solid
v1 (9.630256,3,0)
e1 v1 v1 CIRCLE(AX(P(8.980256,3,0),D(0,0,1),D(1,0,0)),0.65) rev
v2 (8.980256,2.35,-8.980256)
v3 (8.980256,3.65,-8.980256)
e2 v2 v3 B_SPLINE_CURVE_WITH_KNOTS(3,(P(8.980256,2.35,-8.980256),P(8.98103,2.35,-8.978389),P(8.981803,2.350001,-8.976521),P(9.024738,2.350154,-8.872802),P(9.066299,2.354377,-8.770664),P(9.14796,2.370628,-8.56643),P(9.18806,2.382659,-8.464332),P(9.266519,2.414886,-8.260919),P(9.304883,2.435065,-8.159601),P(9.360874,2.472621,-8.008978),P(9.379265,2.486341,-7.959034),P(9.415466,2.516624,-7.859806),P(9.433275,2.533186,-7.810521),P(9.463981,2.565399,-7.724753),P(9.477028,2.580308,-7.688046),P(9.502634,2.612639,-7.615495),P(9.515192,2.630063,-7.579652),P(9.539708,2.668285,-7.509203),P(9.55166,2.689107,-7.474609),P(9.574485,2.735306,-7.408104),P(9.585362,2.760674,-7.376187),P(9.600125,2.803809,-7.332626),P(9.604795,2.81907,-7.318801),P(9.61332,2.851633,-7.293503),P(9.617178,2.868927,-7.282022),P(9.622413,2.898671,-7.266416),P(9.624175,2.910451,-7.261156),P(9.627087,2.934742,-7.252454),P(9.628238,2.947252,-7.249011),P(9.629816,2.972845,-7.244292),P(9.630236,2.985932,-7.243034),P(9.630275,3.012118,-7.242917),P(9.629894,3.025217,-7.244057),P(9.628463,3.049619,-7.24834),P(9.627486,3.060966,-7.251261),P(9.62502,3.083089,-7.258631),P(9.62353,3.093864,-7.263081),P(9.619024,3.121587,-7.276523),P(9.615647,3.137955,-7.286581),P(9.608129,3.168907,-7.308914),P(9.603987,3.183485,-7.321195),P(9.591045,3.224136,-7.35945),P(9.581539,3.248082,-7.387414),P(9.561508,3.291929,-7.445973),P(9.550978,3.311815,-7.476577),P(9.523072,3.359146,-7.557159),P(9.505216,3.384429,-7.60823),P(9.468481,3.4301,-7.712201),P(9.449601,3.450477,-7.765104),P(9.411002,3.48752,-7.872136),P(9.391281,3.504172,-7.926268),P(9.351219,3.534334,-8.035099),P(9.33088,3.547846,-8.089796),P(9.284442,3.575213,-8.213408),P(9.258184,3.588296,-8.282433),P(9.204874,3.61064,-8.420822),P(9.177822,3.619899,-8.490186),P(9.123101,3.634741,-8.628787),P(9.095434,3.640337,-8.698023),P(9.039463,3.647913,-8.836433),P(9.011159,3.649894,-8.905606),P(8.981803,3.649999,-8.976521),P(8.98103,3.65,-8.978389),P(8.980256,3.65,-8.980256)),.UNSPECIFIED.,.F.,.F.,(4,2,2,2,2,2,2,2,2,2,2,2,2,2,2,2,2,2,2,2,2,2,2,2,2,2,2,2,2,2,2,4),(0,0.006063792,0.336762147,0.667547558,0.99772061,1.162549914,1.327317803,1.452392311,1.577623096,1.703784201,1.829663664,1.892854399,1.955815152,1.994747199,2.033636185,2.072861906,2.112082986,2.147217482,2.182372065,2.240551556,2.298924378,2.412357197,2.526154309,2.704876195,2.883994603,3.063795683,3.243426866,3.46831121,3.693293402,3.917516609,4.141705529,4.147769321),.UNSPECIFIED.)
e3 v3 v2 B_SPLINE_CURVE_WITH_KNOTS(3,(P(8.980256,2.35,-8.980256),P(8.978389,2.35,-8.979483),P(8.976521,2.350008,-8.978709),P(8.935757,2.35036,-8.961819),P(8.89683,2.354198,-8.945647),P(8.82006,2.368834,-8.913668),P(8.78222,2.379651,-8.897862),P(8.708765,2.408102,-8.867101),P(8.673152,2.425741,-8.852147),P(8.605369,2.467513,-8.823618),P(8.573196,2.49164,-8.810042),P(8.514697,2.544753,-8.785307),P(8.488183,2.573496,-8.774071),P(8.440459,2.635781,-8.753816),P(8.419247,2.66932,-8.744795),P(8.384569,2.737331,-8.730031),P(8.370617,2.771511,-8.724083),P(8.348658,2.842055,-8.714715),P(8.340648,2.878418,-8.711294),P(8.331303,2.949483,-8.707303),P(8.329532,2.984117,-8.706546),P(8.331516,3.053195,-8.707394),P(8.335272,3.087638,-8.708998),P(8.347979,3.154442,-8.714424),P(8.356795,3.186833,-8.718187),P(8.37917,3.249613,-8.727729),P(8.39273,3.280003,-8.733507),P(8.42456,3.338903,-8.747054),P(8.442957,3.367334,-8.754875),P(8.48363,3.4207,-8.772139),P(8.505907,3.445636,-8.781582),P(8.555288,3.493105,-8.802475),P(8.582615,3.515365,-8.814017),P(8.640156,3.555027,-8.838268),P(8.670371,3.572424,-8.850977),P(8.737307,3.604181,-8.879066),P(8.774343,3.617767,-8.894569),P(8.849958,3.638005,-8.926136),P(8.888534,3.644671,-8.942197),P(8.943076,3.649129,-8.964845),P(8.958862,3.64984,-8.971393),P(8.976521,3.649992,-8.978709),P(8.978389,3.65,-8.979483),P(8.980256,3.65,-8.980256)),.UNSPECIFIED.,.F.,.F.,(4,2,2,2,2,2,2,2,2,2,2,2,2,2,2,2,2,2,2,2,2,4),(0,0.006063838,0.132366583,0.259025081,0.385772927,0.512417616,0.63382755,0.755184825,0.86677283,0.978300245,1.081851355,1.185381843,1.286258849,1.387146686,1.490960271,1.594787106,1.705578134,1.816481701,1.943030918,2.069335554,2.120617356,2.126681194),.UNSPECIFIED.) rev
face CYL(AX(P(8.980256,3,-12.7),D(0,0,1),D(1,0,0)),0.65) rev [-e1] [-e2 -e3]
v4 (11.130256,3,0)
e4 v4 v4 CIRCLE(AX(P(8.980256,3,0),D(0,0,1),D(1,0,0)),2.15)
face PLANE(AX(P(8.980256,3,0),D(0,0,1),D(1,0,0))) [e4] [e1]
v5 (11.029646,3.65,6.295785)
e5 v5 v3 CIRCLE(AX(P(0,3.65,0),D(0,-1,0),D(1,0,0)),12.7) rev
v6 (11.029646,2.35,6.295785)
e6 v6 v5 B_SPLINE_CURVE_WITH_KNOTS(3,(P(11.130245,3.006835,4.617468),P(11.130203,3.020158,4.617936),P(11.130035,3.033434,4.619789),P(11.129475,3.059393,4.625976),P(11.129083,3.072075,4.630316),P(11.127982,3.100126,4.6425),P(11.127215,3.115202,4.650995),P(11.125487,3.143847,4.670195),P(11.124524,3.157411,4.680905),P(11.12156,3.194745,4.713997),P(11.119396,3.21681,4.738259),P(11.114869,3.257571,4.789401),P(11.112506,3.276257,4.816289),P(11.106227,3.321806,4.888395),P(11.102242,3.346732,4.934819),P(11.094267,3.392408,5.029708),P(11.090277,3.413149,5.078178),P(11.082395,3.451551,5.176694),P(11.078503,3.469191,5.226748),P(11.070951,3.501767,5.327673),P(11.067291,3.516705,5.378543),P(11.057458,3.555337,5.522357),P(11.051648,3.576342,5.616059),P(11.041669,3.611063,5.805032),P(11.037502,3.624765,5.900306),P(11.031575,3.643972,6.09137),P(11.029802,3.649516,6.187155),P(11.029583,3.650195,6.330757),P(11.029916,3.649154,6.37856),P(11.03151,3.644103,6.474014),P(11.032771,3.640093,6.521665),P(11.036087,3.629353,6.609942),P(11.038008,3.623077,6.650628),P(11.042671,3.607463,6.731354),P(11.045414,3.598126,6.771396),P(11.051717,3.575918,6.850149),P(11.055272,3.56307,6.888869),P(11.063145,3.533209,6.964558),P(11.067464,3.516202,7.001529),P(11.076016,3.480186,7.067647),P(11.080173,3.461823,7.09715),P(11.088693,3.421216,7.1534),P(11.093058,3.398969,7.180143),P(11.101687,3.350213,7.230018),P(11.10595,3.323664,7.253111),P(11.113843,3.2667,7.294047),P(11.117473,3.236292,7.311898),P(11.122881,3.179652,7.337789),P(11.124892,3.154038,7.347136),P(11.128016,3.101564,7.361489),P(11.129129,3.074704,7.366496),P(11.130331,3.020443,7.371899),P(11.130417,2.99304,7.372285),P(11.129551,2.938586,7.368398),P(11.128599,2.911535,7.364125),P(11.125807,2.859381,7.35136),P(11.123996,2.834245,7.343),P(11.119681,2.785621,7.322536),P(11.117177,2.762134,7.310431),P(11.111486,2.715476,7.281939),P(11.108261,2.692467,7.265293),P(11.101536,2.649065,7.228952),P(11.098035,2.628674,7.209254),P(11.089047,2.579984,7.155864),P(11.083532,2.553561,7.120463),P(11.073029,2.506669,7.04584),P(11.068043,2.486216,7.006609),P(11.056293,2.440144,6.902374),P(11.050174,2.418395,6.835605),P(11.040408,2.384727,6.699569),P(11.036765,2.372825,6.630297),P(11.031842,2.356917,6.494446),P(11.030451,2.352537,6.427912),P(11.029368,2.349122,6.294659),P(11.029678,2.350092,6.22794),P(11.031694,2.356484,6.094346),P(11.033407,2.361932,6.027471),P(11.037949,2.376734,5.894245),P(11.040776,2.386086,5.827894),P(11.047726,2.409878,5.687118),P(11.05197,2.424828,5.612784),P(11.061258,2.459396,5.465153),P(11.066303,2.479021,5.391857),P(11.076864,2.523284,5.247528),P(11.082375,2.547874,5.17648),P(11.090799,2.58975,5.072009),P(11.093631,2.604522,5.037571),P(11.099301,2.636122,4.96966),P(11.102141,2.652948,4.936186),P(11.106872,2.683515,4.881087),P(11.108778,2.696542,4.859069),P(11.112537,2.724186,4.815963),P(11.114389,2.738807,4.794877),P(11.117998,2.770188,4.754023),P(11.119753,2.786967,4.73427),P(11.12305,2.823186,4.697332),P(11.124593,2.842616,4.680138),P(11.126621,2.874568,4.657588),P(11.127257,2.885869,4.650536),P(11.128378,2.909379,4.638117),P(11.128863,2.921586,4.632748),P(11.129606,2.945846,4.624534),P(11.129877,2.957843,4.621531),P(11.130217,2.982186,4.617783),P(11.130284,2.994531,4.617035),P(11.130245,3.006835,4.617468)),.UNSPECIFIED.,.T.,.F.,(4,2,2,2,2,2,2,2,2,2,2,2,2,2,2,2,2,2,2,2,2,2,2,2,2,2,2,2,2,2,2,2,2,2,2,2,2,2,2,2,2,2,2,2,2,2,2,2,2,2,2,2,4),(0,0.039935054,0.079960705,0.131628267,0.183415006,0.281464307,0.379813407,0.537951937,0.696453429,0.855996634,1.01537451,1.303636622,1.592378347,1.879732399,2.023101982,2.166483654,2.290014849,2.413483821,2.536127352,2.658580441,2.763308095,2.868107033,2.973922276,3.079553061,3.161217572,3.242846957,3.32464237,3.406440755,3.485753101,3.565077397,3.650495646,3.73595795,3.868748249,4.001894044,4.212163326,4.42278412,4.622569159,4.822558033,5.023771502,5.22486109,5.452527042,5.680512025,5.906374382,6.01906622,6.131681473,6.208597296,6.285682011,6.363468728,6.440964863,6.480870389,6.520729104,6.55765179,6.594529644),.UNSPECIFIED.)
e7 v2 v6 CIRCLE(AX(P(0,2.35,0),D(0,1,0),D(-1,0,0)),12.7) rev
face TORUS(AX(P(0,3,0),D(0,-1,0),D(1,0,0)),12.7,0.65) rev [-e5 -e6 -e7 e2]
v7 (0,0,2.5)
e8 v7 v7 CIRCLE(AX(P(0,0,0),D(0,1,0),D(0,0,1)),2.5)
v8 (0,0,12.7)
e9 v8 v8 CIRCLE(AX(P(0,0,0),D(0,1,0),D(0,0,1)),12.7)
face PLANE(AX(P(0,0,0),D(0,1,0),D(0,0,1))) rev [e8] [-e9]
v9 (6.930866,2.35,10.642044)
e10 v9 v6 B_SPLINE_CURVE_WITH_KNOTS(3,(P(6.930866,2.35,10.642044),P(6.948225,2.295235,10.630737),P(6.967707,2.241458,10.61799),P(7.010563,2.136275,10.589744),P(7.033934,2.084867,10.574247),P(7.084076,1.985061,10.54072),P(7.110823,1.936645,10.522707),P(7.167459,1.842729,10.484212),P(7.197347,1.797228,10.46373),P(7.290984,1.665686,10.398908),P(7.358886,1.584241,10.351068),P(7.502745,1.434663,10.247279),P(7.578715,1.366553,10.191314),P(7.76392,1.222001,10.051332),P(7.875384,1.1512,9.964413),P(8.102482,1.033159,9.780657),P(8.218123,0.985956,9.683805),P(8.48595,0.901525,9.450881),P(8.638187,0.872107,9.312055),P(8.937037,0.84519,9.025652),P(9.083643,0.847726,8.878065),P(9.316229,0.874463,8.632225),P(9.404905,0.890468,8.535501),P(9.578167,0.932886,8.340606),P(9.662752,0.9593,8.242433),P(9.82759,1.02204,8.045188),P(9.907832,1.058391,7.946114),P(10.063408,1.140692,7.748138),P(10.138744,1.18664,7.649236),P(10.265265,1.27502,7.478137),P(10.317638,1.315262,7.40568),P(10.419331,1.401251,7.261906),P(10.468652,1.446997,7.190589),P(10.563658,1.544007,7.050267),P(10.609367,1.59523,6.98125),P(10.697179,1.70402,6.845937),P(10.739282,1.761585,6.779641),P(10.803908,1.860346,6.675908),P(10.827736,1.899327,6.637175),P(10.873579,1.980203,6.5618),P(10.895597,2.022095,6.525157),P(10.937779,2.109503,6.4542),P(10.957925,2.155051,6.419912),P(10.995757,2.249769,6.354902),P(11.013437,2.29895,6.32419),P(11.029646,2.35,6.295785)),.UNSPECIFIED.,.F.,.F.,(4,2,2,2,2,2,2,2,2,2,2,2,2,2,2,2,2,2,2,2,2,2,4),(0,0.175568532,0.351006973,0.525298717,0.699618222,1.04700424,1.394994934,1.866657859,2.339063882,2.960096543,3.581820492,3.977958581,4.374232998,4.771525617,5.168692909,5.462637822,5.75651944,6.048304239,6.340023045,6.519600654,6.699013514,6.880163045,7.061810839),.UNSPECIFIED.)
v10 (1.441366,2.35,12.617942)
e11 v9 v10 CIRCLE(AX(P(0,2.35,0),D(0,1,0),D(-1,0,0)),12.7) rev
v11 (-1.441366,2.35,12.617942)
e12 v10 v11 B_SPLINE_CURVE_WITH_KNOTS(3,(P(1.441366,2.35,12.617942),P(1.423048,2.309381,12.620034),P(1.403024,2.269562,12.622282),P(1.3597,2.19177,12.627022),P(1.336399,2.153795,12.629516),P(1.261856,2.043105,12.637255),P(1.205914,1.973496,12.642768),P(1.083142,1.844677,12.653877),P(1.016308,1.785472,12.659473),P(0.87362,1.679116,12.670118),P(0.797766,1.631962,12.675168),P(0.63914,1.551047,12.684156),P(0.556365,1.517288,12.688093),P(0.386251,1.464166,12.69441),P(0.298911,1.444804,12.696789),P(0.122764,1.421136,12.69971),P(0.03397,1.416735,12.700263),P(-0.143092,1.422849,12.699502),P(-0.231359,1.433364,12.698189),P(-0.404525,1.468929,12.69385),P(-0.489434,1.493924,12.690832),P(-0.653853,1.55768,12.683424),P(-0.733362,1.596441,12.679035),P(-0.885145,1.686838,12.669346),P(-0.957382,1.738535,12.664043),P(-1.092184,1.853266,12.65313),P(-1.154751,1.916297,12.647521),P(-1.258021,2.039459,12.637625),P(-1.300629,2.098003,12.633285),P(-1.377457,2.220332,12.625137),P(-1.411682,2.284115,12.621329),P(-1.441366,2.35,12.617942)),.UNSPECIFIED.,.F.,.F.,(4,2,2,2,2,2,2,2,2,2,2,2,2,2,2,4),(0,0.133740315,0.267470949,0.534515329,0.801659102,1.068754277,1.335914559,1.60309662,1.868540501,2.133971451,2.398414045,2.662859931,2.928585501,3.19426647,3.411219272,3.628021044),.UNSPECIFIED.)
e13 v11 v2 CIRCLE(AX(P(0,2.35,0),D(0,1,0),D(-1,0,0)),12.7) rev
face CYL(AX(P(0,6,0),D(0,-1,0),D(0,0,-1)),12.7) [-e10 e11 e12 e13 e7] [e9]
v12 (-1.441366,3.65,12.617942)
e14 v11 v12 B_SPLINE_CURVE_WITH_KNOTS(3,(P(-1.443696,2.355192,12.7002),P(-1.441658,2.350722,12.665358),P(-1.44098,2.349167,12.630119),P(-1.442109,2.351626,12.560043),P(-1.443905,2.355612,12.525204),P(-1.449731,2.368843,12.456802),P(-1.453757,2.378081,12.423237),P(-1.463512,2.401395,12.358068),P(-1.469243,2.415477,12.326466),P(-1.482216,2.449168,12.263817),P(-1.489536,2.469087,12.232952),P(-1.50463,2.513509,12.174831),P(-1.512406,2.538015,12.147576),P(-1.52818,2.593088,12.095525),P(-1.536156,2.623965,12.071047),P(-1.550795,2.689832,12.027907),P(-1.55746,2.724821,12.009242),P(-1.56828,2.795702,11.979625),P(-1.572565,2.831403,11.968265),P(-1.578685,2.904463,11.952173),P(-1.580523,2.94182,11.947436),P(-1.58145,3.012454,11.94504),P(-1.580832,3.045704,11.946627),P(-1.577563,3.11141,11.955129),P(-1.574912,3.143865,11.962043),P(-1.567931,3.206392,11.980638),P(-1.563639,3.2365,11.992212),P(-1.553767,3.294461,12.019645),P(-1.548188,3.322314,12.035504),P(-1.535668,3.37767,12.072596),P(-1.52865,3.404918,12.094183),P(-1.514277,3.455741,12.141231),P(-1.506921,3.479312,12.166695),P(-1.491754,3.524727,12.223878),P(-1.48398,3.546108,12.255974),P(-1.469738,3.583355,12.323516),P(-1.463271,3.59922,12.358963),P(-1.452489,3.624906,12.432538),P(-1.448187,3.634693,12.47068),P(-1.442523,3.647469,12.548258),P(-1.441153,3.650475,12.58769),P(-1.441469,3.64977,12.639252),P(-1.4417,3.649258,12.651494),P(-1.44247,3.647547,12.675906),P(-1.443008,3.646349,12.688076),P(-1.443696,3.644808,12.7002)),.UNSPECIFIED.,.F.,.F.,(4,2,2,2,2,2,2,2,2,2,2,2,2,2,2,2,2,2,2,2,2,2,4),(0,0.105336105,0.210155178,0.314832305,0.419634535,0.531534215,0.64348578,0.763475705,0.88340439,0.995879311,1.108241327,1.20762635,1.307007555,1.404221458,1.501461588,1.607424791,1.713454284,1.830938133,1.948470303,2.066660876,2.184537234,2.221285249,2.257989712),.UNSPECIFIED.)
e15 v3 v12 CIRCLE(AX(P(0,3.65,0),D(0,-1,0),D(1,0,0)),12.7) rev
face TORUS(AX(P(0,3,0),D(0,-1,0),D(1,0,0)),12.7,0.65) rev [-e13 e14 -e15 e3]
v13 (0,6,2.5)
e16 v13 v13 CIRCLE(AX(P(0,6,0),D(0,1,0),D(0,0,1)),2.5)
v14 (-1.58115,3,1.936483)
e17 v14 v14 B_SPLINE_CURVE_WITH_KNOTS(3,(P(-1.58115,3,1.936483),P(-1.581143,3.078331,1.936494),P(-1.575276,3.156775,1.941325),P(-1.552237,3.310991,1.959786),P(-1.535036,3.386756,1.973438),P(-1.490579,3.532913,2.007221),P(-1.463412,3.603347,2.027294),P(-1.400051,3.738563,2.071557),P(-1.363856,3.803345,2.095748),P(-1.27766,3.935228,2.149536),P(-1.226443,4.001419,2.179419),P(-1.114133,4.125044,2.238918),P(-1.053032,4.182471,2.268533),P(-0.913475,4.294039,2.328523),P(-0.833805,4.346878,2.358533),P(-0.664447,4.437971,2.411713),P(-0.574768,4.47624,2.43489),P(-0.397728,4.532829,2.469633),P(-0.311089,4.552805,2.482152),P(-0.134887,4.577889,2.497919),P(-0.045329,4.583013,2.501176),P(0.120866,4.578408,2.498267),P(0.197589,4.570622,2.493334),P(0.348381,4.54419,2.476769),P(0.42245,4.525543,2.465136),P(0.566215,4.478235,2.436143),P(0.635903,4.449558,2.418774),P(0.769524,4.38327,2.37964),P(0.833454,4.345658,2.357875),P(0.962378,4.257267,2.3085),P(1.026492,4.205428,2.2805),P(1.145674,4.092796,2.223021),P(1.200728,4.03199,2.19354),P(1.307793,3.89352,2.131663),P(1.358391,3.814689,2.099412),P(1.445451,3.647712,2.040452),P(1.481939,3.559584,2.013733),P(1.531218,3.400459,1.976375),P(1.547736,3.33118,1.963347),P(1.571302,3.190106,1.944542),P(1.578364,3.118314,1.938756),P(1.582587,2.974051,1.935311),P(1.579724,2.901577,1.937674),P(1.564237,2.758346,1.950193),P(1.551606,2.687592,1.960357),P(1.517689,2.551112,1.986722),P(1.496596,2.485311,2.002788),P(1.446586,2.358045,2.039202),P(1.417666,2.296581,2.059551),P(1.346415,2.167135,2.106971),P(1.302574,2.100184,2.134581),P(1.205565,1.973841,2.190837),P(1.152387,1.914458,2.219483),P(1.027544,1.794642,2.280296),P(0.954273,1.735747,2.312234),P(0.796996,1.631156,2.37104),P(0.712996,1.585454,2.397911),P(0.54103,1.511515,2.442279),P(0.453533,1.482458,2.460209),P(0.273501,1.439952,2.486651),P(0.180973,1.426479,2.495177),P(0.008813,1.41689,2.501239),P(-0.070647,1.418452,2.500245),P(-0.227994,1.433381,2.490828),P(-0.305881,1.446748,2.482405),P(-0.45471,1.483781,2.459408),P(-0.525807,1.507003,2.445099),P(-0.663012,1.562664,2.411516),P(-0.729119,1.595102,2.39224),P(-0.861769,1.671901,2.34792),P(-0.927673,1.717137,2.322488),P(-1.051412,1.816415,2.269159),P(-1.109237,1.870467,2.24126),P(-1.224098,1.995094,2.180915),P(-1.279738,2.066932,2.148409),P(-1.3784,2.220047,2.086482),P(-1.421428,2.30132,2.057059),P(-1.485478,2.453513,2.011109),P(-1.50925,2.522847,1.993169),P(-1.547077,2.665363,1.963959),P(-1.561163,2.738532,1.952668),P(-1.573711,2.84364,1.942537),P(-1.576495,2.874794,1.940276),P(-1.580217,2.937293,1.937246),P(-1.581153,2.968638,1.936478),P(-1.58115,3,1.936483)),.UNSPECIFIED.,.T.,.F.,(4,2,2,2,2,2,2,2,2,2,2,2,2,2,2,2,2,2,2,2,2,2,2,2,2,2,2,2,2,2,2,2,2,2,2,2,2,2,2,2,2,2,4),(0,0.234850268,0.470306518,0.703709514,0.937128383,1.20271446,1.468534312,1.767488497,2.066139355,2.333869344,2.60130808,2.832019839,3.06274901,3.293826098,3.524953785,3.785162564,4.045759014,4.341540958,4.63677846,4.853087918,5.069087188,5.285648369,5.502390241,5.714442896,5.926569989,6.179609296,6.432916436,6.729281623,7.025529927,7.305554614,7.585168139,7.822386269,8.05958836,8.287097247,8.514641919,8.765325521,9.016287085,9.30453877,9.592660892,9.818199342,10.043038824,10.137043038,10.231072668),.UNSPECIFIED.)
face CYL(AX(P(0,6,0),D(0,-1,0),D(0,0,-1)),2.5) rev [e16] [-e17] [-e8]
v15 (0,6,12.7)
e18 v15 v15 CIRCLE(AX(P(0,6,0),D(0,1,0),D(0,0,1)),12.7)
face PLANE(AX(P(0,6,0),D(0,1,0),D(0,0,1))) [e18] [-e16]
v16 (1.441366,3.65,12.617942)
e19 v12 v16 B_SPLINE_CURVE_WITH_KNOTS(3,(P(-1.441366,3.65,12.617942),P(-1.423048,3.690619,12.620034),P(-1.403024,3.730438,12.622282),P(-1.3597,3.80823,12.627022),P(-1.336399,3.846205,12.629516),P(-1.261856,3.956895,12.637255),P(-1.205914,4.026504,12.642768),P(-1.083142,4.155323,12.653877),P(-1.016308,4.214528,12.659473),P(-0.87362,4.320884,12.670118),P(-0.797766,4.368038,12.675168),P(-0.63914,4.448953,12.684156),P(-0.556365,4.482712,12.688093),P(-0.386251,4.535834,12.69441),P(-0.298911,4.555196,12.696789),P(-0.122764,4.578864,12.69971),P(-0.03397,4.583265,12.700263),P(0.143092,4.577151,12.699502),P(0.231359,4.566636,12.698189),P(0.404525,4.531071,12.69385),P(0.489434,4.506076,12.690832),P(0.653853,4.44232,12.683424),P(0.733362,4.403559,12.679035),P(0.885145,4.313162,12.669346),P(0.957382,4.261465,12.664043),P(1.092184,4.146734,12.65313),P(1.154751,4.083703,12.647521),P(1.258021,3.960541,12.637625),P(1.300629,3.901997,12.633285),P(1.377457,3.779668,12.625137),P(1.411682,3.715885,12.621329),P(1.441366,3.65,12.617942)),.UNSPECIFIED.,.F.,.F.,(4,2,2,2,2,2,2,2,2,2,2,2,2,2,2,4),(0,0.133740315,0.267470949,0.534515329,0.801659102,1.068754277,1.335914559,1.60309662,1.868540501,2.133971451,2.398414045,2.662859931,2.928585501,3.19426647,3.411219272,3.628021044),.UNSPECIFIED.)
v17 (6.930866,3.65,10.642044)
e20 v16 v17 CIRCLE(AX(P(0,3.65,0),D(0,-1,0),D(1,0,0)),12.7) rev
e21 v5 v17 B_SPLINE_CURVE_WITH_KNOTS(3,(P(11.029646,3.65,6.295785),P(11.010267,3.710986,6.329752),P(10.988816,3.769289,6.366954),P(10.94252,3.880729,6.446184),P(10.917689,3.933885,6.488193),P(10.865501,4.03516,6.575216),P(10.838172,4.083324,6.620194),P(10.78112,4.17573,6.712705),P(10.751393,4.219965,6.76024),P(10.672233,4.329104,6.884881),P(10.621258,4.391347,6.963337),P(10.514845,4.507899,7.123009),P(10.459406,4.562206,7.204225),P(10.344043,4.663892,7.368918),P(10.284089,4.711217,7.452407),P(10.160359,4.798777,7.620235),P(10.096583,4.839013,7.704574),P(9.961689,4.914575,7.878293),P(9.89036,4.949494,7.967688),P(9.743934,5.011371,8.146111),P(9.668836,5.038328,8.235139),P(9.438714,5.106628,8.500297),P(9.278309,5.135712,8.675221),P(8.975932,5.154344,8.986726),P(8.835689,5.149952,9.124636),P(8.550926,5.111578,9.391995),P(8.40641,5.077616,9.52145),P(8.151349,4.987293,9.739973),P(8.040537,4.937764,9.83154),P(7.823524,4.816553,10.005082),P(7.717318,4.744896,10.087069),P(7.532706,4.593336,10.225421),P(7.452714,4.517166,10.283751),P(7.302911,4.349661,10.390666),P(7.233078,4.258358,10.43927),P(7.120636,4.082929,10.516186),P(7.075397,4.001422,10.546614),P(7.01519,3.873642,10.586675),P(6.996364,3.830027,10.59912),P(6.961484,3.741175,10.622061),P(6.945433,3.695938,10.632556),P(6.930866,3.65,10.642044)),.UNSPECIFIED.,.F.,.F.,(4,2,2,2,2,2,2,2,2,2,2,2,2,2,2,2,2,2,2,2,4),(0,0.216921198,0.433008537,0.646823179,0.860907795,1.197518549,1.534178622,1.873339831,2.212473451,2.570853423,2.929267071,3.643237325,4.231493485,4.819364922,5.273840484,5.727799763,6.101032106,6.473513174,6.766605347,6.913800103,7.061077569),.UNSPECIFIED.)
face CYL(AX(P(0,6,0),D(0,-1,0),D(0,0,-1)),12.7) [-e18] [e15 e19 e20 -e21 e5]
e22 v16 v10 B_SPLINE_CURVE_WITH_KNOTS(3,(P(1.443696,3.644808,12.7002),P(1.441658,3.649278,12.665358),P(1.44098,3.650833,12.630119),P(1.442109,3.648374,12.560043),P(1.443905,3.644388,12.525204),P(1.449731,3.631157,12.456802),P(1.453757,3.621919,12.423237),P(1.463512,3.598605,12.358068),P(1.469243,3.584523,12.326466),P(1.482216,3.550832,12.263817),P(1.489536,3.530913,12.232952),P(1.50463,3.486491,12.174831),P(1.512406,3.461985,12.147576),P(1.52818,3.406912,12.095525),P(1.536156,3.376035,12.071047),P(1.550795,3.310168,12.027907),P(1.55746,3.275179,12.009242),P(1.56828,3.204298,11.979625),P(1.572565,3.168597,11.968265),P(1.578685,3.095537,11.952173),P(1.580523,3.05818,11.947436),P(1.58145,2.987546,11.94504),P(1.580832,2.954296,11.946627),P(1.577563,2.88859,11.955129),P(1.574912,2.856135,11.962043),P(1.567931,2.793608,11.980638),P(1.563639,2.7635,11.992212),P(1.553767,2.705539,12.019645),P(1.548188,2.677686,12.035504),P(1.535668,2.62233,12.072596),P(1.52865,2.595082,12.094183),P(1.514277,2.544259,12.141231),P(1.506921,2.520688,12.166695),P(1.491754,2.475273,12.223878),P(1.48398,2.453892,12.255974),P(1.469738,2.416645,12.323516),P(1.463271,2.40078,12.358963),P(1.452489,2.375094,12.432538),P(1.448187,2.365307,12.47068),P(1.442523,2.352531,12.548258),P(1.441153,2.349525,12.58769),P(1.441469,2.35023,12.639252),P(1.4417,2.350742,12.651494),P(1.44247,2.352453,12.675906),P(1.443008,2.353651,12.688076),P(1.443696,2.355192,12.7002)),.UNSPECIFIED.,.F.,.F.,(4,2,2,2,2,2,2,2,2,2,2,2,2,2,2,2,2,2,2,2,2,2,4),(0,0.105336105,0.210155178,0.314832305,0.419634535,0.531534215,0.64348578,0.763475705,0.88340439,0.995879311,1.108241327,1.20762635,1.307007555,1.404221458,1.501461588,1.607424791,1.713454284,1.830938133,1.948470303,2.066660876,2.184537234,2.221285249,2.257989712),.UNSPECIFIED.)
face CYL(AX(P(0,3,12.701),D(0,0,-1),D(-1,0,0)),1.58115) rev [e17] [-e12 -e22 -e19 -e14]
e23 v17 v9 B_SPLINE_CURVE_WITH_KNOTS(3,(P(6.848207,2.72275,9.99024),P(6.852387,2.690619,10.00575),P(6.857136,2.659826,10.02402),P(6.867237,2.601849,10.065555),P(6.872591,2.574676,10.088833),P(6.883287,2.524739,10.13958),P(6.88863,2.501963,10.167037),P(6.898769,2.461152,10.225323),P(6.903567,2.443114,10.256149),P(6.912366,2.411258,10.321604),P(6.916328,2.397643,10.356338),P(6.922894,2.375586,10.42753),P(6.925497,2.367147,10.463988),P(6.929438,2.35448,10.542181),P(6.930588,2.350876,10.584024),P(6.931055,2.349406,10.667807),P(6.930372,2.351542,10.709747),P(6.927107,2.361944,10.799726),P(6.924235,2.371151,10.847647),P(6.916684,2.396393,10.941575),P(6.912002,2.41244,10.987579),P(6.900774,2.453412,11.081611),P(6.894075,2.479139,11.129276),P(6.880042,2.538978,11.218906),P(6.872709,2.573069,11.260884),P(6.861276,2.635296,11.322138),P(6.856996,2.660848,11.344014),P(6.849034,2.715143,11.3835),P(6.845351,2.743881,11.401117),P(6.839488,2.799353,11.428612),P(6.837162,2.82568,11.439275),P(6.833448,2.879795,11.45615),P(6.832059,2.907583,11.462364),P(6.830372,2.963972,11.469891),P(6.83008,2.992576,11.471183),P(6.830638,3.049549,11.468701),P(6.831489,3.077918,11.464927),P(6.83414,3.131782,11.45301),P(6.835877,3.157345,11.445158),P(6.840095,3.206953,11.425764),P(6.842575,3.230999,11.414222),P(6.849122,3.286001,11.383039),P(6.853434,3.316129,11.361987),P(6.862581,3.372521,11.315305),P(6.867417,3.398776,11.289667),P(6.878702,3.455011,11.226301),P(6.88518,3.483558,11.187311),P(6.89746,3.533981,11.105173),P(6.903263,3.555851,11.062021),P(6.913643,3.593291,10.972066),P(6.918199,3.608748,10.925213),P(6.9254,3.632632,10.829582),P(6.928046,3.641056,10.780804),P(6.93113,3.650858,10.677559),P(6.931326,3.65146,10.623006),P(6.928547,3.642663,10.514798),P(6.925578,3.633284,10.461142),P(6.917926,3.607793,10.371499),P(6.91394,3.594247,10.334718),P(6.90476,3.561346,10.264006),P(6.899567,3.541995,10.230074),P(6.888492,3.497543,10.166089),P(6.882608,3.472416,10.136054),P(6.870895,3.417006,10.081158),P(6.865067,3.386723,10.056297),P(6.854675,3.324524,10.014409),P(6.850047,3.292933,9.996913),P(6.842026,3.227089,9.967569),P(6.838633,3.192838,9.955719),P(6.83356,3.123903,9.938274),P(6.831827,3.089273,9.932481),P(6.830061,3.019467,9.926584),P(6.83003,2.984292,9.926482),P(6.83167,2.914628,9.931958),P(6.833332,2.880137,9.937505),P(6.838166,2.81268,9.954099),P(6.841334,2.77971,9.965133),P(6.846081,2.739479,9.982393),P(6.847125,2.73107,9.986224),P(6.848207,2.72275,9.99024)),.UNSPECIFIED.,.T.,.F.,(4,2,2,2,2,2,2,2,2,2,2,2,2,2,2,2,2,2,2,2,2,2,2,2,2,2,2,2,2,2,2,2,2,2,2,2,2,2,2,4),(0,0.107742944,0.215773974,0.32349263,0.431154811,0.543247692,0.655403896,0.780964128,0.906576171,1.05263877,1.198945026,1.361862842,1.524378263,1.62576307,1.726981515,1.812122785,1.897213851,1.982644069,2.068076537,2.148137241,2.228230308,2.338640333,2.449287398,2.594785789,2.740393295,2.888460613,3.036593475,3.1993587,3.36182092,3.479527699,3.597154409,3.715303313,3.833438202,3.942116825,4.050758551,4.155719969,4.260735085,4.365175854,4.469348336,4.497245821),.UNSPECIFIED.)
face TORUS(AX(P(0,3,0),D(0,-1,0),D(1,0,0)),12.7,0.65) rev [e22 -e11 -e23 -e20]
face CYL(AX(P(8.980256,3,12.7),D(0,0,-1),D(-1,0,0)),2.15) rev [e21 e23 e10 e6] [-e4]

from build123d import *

# Parameters (mm, degrees)
BASE_R                  = 12.7
BASE_R_2                = 2.5
MAIN_BODY_DEPTH         = 6
SKETCH4_R               = 0.65
CUT_EXTRUDE2_REACH      = 20.936
SKETCH5_R               = 1.58115
CUT_EXTRUDE3_DEPTH      = 19.936208869
CUT_EXTRUDE3_DEPTH_BACK = 19.936208869
SKETCH8_R               = 0.65
SKETCH9_R               = 2.15
CUT_EXTRUDE4_DEPTH      = 19.936208869


with BuildPart() as part:
    # BASE → MAIN_BODY (new body)
    with BuildSketch(Plane(origin=(0, 0, 0), x_dir=(1, 0, 0), z_dir=(0, 1, 0))):
        Circle(BASE_R)
        Circle(BASE_R_2, mode=Mode.SUBTRACT)
    extrude(amount=MAIN_BODY_DEPTH)

    # Sketch4 → CABLE_GUIDE (revolve, cut)
    with BuildSketch(Plane.XY):
        with Locations((12.7, 3)):
            Circle(SKETCH4_R)
    revolve(axis=Axis((0, 0, 0), (0, 1, 0)), mode=Mode.SUBTRACT)

    # Sketch5 → Cut-Extrude2 (cut, up to next)
    with BuildSketch(Plane.XY, mode=Mode.PRIVATE) as cut_extrude2_sk1:
        with Locations((0, 3)):
            Circle(SKETCH5_R)
    cut_extrude2_tool1 = extrude(cut_extrude2_sk1.sketch, amount=CUT_EXTRUDE2_REACH, mode=Mode.PRIVATE) & part.part
    add(cut_extrude2_tool1.solids().sort_by_distance((0, 3, 0))[0], mode=Mode.SUBTRACT)

    # Sketch8 → Cut-Extrude3 (cut, two sides: drawn at the far end of the back side and taken through both)
    with BuildSketch(Plane.XY.offset(-CUT_EXTRUDE3_DEPTH_BACK)):
        with Locations((8.98025612, 3)):
            Circle(SKETCH8_R)
    extrude(amount=CUT_EXTRUDE3_DEPTH + CUT_EXTRUDE3_DEPTH_BACK, mode=Mode.SUBTRACT)

    # Sketch9 → Cut-Extrude4 (cut, through all)
    with BuildSketch(Plane.XY):
        with Locations((8.98025612, 3)):
            Circle(SKETCH9_R)
    extrude(amount=CUT_EXTRUDE4_DEPTH, mode=Mode.SUBTRACT)


solid = part.part
